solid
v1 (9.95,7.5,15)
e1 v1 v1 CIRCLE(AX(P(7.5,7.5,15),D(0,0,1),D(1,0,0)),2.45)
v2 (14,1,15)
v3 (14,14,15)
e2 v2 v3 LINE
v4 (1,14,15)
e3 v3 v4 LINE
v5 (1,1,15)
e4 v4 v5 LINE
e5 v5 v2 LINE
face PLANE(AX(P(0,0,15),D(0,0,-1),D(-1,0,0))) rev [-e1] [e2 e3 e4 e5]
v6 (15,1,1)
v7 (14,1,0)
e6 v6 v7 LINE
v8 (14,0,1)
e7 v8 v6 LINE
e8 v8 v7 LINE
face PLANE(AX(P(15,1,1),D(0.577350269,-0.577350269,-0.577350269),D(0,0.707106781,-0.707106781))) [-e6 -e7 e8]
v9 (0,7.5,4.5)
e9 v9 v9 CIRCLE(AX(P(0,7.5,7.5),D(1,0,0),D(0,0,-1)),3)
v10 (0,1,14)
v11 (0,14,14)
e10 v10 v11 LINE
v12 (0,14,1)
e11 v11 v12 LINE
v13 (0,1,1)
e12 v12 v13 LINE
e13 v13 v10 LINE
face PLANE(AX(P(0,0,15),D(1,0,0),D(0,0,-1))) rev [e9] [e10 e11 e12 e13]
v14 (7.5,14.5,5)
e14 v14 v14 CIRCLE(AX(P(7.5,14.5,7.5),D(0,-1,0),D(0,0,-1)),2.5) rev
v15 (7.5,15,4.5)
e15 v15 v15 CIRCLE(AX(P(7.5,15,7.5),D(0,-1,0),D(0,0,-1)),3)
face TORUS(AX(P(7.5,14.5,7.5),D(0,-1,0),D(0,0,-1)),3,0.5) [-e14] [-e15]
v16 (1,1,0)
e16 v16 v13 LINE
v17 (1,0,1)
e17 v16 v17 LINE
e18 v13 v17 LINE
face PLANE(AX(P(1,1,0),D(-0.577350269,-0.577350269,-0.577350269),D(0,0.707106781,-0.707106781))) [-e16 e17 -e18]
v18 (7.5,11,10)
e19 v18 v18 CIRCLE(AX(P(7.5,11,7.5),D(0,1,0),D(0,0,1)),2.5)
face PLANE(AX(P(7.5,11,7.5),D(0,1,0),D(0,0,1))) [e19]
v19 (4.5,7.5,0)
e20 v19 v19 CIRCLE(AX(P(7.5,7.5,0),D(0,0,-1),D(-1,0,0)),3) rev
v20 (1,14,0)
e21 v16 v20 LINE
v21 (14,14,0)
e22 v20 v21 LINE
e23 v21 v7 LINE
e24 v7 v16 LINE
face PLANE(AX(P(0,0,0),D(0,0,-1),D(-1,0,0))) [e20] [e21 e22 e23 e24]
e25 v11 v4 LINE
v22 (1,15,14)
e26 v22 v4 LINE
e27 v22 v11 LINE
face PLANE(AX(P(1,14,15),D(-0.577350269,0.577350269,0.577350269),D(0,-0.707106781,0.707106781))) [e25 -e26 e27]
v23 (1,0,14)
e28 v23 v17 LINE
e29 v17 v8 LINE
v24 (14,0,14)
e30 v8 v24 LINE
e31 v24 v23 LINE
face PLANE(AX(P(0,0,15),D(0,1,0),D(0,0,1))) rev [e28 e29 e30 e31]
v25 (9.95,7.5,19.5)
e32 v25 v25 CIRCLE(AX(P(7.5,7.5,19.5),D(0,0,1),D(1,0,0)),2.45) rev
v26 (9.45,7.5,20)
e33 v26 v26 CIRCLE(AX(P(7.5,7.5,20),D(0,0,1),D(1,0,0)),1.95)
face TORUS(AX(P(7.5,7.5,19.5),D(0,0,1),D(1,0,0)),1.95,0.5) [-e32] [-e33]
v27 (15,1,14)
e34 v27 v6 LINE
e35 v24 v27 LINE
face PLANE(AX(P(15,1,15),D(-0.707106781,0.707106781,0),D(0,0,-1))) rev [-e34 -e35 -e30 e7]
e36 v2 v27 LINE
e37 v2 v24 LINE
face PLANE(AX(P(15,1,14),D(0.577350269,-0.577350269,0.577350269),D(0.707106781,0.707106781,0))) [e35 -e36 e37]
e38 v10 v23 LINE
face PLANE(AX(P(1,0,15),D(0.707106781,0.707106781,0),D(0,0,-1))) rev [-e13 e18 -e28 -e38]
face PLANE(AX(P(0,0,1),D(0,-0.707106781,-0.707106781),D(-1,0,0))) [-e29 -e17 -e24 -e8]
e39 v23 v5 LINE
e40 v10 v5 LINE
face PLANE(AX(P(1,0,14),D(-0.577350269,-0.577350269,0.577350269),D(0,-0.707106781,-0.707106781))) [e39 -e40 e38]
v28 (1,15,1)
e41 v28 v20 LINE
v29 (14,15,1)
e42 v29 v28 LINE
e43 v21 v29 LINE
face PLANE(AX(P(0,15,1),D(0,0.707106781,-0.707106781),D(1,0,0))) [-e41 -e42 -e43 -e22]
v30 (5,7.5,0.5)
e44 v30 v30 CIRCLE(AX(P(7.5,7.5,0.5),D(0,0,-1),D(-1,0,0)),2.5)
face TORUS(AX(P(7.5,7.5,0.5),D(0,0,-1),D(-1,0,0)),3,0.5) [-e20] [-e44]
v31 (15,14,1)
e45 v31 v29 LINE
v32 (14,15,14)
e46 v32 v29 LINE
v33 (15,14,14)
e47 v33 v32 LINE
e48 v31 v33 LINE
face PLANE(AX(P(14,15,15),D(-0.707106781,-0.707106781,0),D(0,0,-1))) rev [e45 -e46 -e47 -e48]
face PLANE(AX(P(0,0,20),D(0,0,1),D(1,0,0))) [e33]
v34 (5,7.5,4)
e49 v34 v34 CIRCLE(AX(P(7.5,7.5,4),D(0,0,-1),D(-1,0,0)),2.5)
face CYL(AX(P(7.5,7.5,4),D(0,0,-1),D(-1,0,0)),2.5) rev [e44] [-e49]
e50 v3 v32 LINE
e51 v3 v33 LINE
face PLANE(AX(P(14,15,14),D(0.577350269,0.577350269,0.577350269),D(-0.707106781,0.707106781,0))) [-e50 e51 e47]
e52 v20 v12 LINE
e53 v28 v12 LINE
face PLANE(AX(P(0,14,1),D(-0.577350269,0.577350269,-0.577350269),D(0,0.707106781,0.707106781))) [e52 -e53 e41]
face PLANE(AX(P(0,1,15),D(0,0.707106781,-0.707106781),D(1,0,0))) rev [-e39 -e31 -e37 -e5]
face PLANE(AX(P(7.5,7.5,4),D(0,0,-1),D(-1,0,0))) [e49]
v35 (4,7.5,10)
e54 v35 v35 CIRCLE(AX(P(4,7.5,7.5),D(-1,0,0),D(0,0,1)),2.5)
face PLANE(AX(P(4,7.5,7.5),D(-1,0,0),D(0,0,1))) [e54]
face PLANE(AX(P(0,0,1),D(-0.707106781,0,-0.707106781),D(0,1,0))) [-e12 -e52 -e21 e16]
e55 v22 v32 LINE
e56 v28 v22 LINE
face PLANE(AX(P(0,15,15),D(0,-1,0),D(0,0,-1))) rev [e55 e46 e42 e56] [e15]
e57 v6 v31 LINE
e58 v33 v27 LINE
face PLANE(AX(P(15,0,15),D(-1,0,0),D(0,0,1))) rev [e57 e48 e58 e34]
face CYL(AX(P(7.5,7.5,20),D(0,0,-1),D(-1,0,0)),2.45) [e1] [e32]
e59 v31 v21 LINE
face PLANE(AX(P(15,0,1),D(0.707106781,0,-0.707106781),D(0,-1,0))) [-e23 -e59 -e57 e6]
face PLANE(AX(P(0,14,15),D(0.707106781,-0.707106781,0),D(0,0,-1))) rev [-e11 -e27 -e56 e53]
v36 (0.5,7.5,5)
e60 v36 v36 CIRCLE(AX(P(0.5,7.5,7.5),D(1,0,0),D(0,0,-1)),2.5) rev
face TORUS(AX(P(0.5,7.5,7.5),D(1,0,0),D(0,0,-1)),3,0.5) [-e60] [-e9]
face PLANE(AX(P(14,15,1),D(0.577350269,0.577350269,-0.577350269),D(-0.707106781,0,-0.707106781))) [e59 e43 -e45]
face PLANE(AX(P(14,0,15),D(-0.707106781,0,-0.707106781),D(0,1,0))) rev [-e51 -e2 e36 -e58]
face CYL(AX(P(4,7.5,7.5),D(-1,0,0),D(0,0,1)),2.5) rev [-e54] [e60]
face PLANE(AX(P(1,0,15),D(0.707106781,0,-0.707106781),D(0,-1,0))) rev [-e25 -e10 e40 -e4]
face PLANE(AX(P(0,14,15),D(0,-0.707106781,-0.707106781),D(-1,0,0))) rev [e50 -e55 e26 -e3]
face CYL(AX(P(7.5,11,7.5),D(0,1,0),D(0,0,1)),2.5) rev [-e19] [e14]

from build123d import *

# Parameters (mm, degrees)
SKETCH1_W           = 15
SKETCH1_H           = 15
BOSS_EXTRUDE1_DEPTH = 15
SKETCH2_R           = 2.45
BOSS_EXTRUDE2_DEPTH = 5
SKETCH7_R           = 2.5
CUT_EXTRUDE1_DEPTH  = 4
SKETCH13_R          = 2.5
CUT_EXTRUDE6_DEPTH  = 4
SKETCH16_R          = 2.5
CUT_EXTRUDE7_DEPTH  = 4
CHAMFER1_SIZE       = 1
FILLET1_R           = 0.5


with BuildPart() as part:
    # Sketch1 → Boss-Extrude1 (new body)
    with BuildSketch(Plane.XY):
        with Locations((7.5, 7.5)):
            Rectangle(SKETCH1_W, SKETCH1_H)
    extrude(amount=BOSS_EXTRUDE1_DEPTH)

    # Sketch2 → Boss-Extrude2 (add)
    with BuildSketch(Plane.XY.offset(15)):
        with Locations((7.5, 7.5)):
            Circle(SKETCH2_R)
    extrude(amount=BOSS_EXTRUDE2_DEPTH)

    # Sketch7 → Cut-Extrude1 (cut)
    with BuildSketch(Plane.ZY):
        with Locations((7.5, 7.5)):
            Circle(SKETCH7_R)
    extrude(amount=-CUT_EXTRUDE1_DEPTH, mode=Mode.SUBTRACT)

    # Sketch13 → Cut-Extrude6 (cut)
    with BuildSketch(Plane(origin=(0, 15, 0), x_dir=(1, 0, 0), z_dir=(0, 1, 0))):
        with Locations((7.5, -7.5)):
            Circle(SKETCH13_R)
    extrude(amount=-CUT_EXTRUDE6_DEPTH, mode=Mode.SUBTRACT)

    # Sketch16 → Cut-Extrude7 (cut)
    with BuildSketch(Plane(origin=(0, 0, 0), x_dir=(-1, 0, 0), z_dir=(0, 0, -1))):
        with Locations((-7.5, 7.5)):
            Circle(SKETCH16_R)
    extrude(amount=-CUT_EXTRUDE7_DEPTH, mode=Mode.SUBTRACT)

    # Chamfer1
    chamfer1_edges = [part.edges().sort_by_distance(p)[0] for p in [
        (7.5, 15, 15),
        (15, 15, 7.5),
        (15, 7.5, 15),
        (15, 0, 7.5),
        (7.5, 0, 15),
        (15, 7.5, 0),
        (7.5, 0, 0),
        (0, 7.5, 15),
        (0, 0, 7.5),
        (0, 15, 7.5),
        (7.5, 15, 0),
        (0, 7.5, 0),
    ]]
    chamfer(chamfer1_edges, length=CHAMFER1_SIZE)

    # Fillet1
    fillet1_edges = [part.edges().sort_by_distance(p)[0] for p in [
        (0, 7.5, 5),
        (5.05, 7.5, 20),
        (5, 15, 7.5),
        (10, 7.5, 0),
    ]]
    fillet(fillet1_edges, radius=FILLET1_R)


solid = part.part
